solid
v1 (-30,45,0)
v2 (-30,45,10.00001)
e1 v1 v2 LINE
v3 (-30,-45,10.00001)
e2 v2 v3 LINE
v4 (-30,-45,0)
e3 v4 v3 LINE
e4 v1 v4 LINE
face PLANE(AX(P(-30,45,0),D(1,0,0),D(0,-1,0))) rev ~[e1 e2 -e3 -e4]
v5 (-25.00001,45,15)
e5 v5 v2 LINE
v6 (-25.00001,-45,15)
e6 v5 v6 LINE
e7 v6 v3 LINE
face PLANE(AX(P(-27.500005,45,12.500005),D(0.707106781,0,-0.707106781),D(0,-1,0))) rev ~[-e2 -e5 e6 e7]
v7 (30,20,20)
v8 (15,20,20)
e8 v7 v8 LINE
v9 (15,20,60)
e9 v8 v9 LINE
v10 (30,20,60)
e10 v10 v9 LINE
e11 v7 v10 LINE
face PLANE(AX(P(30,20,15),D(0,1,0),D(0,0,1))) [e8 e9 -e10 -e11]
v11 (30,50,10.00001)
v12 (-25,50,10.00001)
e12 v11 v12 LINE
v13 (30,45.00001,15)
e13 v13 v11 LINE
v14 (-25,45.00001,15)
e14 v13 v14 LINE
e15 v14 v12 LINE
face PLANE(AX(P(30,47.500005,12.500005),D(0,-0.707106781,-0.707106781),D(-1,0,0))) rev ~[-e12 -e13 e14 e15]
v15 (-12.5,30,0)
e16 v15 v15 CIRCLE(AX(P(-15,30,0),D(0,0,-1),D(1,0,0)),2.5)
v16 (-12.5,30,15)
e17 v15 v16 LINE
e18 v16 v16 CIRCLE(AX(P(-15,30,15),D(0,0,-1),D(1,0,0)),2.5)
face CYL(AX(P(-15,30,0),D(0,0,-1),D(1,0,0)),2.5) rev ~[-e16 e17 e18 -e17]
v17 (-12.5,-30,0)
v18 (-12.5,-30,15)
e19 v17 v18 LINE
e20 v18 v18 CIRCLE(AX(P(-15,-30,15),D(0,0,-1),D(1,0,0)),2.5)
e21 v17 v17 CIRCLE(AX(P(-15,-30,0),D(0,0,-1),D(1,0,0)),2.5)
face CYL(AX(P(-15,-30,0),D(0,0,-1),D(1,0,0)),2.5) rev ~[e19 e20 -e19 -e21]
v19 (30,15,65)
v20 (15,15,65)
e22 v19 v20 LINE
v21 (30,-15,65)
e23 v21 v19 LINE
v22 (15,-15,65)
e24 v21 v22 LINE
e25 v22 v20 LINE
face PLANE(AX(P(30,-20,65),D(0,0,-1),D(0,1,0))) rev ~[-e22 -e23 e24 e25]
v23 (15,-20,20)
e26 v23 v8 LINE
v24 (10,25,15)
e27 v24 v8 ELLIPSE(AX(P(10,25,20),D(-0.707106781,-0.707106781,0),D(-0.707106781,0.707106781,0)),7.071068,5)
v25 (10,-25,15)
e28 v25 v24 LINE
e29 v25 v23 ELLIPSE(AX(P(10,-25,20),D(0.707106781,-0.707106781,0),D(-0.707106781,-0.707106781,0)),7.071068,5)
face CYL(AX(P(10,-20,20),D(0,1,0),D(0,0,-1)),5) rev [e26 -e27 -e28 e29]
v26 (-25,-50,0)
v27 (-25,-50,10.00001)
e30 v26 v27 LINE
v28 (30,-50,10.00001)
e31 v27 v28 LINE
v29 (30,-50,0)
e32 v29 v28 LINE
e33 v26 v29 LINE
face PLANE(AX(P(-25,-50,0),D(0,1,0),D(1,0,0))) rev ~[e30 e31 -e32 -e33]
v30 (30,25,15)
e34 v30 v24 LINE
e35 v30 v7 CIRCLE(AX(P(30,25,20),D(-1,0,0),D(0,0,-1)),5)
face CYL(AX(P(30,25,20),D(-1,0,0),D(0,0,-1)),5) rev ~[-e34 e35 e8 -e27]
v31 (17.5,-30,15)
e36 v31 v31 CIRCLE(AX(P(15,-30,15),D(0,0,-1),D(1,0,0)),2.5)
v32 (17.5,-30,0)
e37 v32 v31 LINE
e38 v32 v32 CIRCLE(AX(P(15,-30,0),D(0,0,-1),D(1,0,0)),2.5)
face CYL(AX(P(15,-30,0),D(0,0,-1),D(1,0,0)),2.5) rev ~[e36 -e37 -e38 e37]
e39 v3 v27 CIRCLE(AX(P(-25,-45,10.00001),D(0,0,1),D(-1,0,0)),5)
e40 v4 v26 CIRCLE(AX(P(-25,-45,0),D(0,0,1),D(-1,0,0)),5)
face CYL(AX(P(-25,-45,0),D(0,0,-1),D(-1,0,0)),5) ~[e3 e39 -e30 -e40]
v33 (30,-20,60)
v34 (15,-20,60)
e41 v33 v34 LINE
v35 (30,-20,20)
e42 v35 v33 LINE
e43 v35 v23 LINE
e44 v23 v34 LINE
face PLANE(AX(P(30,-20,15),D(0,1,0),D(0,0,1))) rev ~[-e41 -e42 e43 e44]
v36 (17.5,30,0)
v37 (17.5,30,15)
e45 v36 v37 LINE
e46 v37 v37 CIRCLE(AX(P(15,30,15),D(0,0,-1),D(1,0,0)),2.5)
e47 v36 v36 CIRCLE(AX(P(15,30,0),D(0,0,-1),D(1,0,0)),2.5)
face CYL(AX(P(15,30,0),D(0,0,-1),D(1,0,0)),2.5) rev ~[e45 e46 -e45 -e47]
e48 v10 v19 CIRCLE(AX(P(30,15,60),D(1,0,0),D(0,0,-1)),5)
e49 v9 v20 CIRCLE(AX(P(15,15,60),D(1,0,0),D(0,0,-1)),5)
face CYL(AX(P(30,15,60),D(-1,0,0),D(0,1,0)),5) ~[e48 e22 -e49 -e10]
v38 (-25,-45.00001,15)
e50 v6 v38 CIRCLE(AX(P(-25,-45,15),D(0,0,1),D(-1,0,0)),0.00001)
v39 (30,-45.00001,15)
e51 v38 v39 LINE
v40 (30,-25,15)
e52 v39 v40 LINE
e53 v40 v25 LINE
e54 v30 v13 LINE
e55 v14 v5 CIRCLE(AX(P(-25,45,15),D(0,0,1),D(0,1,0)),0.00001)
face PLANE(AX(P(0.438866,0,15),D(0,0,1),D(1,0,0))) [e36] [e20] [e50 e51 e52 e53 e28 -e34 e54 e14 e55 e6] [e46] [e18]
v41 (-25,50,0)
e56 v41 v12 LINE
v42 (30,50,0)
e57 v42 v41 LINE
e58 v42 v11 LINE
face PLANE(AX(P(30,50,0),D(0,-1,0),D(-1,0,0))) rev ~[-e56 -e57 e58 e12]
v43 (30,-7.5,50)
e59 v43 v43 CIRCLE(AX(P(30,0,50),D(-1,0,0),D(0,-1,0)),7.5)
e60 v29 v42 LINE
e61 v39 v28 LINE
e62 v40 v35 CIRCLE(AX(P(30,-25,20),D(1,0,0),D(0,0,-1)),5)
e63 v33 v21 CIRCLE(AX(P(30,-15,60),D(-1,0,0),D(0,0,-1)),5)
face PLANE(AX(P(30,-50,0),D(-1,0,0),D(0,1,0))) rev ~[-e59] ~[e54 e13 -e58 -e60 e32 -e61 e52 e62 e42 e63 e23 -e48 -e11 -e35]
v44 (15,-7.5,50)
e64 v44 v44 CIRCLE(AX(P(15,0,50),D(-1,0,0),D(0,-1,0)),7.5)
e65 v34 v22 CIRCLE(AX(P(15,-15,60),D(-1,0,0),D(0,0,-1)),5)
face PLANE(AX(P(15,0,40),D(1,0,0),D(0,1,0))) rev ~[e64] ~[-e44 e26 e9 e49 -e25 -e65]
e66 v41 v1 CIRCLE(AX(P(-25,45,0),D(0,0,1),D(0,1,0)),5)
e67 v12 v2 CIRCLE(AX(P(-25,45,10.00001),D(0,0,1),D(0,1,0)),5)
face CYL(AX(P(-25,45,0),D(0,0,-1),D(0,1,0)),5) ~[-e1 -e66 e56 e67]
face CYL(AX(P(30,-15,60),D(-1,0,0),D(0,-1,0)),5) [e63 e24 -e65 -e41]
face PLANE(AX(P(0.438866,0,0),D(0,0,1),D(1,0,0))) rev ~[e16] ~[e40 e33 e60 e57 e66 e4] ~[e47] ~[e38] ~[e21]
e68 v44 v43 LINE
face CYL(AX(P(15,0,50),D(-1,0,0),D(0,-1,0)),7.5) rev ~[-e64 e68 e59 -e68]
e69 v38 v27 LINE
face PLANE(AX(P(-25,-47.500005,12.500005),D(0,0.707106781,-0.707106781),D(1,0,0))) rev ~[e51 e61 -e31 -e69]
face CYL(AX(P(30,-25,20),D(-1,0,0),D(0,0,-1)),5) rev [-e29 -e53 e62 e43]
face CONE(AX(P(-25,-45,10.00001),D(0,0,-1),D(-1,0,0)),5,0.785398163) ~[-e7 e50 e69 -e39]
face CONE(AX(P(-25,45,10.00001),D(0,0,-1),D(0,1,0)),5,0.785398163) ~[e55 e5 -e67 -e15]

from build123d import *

# Parameters (mm, degrees)
F1_DEPTH = 15
F2_W     = 40
F2_H     = 50
F3_DEPTH = 15
F4_R     = 5
F5_SIZE  = 4.99999
F6_R     = 7.5
F7_DEPTH = 15
F8_R     = 2.5
F9_DEPTH = 15


# Not quite as in the source:
# - a fillet or chamfer is up to 0.001 mm smaller than in the source, because OpenCascade refuses the exact size


with BuildPart() as f1:
    # F0 (on Top) → F1 (new body)
    with BuildSketch(Plane.XY):
        with BuildLine():
            Line((-25, -50), (30, -50))
            Line((30, -50), (30, 50))
            Line((30, 50), (-25, 50))
            ThreePointArc((-25, 50), (-28.5355339059, 48.5355339059), (-30, 45))
            Line((-30, 45), (-30, -45))
            ThreePointArc((-30, -45), (-28.5355339059, -48.5355339059), (-25, -50))
        make_face()
    extrude(amount=F1_DEPTH)

    # F2 (on face) → F3 (join)
    with BuildSketch(Plane.YZ.offset(30)):
        with Locations((0, 40)):
            Rectangle(F2_W, F2_H)
    extrude(amount=-F3_DEPTH)

    # F4
    f4_edges = [f1.edges().sort_by_distance(p)[0] for p in [
        (22.5, -20, 15),
        (15, 0, 15),
        (22.5, 20, 15),
        (22.5, -20, 65),
        (22.5, 20, 65),
    ]]
    fillet(f4_edges, radius=F4_R)

    # F5 (size 5 in the source; OpenCascade refuses exactly that, so slightly less here)
    f5_edges = [f1.edges().sort_by_distance(p)[0] for p in [
        (2.5, 50, 15),
        (-28.535534, 48.535534, 15),
        (-30, 0, 15),
        (-28.535534, -48.535534, 15),
        (2.5, -50, 15),
    ]]
    chamfer(f5_edges, length=F5_SIZE)

    # F6 (on face) → F7 (cut, through all)
    with BuildSketch(Plane(origin=(15, 0, 0), x_dir=(0, -1, 0), z_dir=(-1, 0, 0))):
        with Locations((0, 50)):
            Circle(F6_R)
    extrude(amount=-F7_DEPTH, mode=Mode.SUBTRACT)

    # F8 (on face) → F9 (cut, through all)
    with BuildSketch(Plane(origin=(0, 0, 0), x_dir=(1, 0, 0), z_dir=(0, 0, -1))):
        with Locations((-15, -30)):
            Circle(F8_R)
        with Locations((-15, 30)):
            Circle(F8_R)
        with Locations((15, -30)):
            Circle(F8_R)
        with Locations((15, 30)):
            Circle(F8_R)
    extrude(amount=-F9_DEPTH, mode=Mode.SUBTRACT)


solid = f1.part
